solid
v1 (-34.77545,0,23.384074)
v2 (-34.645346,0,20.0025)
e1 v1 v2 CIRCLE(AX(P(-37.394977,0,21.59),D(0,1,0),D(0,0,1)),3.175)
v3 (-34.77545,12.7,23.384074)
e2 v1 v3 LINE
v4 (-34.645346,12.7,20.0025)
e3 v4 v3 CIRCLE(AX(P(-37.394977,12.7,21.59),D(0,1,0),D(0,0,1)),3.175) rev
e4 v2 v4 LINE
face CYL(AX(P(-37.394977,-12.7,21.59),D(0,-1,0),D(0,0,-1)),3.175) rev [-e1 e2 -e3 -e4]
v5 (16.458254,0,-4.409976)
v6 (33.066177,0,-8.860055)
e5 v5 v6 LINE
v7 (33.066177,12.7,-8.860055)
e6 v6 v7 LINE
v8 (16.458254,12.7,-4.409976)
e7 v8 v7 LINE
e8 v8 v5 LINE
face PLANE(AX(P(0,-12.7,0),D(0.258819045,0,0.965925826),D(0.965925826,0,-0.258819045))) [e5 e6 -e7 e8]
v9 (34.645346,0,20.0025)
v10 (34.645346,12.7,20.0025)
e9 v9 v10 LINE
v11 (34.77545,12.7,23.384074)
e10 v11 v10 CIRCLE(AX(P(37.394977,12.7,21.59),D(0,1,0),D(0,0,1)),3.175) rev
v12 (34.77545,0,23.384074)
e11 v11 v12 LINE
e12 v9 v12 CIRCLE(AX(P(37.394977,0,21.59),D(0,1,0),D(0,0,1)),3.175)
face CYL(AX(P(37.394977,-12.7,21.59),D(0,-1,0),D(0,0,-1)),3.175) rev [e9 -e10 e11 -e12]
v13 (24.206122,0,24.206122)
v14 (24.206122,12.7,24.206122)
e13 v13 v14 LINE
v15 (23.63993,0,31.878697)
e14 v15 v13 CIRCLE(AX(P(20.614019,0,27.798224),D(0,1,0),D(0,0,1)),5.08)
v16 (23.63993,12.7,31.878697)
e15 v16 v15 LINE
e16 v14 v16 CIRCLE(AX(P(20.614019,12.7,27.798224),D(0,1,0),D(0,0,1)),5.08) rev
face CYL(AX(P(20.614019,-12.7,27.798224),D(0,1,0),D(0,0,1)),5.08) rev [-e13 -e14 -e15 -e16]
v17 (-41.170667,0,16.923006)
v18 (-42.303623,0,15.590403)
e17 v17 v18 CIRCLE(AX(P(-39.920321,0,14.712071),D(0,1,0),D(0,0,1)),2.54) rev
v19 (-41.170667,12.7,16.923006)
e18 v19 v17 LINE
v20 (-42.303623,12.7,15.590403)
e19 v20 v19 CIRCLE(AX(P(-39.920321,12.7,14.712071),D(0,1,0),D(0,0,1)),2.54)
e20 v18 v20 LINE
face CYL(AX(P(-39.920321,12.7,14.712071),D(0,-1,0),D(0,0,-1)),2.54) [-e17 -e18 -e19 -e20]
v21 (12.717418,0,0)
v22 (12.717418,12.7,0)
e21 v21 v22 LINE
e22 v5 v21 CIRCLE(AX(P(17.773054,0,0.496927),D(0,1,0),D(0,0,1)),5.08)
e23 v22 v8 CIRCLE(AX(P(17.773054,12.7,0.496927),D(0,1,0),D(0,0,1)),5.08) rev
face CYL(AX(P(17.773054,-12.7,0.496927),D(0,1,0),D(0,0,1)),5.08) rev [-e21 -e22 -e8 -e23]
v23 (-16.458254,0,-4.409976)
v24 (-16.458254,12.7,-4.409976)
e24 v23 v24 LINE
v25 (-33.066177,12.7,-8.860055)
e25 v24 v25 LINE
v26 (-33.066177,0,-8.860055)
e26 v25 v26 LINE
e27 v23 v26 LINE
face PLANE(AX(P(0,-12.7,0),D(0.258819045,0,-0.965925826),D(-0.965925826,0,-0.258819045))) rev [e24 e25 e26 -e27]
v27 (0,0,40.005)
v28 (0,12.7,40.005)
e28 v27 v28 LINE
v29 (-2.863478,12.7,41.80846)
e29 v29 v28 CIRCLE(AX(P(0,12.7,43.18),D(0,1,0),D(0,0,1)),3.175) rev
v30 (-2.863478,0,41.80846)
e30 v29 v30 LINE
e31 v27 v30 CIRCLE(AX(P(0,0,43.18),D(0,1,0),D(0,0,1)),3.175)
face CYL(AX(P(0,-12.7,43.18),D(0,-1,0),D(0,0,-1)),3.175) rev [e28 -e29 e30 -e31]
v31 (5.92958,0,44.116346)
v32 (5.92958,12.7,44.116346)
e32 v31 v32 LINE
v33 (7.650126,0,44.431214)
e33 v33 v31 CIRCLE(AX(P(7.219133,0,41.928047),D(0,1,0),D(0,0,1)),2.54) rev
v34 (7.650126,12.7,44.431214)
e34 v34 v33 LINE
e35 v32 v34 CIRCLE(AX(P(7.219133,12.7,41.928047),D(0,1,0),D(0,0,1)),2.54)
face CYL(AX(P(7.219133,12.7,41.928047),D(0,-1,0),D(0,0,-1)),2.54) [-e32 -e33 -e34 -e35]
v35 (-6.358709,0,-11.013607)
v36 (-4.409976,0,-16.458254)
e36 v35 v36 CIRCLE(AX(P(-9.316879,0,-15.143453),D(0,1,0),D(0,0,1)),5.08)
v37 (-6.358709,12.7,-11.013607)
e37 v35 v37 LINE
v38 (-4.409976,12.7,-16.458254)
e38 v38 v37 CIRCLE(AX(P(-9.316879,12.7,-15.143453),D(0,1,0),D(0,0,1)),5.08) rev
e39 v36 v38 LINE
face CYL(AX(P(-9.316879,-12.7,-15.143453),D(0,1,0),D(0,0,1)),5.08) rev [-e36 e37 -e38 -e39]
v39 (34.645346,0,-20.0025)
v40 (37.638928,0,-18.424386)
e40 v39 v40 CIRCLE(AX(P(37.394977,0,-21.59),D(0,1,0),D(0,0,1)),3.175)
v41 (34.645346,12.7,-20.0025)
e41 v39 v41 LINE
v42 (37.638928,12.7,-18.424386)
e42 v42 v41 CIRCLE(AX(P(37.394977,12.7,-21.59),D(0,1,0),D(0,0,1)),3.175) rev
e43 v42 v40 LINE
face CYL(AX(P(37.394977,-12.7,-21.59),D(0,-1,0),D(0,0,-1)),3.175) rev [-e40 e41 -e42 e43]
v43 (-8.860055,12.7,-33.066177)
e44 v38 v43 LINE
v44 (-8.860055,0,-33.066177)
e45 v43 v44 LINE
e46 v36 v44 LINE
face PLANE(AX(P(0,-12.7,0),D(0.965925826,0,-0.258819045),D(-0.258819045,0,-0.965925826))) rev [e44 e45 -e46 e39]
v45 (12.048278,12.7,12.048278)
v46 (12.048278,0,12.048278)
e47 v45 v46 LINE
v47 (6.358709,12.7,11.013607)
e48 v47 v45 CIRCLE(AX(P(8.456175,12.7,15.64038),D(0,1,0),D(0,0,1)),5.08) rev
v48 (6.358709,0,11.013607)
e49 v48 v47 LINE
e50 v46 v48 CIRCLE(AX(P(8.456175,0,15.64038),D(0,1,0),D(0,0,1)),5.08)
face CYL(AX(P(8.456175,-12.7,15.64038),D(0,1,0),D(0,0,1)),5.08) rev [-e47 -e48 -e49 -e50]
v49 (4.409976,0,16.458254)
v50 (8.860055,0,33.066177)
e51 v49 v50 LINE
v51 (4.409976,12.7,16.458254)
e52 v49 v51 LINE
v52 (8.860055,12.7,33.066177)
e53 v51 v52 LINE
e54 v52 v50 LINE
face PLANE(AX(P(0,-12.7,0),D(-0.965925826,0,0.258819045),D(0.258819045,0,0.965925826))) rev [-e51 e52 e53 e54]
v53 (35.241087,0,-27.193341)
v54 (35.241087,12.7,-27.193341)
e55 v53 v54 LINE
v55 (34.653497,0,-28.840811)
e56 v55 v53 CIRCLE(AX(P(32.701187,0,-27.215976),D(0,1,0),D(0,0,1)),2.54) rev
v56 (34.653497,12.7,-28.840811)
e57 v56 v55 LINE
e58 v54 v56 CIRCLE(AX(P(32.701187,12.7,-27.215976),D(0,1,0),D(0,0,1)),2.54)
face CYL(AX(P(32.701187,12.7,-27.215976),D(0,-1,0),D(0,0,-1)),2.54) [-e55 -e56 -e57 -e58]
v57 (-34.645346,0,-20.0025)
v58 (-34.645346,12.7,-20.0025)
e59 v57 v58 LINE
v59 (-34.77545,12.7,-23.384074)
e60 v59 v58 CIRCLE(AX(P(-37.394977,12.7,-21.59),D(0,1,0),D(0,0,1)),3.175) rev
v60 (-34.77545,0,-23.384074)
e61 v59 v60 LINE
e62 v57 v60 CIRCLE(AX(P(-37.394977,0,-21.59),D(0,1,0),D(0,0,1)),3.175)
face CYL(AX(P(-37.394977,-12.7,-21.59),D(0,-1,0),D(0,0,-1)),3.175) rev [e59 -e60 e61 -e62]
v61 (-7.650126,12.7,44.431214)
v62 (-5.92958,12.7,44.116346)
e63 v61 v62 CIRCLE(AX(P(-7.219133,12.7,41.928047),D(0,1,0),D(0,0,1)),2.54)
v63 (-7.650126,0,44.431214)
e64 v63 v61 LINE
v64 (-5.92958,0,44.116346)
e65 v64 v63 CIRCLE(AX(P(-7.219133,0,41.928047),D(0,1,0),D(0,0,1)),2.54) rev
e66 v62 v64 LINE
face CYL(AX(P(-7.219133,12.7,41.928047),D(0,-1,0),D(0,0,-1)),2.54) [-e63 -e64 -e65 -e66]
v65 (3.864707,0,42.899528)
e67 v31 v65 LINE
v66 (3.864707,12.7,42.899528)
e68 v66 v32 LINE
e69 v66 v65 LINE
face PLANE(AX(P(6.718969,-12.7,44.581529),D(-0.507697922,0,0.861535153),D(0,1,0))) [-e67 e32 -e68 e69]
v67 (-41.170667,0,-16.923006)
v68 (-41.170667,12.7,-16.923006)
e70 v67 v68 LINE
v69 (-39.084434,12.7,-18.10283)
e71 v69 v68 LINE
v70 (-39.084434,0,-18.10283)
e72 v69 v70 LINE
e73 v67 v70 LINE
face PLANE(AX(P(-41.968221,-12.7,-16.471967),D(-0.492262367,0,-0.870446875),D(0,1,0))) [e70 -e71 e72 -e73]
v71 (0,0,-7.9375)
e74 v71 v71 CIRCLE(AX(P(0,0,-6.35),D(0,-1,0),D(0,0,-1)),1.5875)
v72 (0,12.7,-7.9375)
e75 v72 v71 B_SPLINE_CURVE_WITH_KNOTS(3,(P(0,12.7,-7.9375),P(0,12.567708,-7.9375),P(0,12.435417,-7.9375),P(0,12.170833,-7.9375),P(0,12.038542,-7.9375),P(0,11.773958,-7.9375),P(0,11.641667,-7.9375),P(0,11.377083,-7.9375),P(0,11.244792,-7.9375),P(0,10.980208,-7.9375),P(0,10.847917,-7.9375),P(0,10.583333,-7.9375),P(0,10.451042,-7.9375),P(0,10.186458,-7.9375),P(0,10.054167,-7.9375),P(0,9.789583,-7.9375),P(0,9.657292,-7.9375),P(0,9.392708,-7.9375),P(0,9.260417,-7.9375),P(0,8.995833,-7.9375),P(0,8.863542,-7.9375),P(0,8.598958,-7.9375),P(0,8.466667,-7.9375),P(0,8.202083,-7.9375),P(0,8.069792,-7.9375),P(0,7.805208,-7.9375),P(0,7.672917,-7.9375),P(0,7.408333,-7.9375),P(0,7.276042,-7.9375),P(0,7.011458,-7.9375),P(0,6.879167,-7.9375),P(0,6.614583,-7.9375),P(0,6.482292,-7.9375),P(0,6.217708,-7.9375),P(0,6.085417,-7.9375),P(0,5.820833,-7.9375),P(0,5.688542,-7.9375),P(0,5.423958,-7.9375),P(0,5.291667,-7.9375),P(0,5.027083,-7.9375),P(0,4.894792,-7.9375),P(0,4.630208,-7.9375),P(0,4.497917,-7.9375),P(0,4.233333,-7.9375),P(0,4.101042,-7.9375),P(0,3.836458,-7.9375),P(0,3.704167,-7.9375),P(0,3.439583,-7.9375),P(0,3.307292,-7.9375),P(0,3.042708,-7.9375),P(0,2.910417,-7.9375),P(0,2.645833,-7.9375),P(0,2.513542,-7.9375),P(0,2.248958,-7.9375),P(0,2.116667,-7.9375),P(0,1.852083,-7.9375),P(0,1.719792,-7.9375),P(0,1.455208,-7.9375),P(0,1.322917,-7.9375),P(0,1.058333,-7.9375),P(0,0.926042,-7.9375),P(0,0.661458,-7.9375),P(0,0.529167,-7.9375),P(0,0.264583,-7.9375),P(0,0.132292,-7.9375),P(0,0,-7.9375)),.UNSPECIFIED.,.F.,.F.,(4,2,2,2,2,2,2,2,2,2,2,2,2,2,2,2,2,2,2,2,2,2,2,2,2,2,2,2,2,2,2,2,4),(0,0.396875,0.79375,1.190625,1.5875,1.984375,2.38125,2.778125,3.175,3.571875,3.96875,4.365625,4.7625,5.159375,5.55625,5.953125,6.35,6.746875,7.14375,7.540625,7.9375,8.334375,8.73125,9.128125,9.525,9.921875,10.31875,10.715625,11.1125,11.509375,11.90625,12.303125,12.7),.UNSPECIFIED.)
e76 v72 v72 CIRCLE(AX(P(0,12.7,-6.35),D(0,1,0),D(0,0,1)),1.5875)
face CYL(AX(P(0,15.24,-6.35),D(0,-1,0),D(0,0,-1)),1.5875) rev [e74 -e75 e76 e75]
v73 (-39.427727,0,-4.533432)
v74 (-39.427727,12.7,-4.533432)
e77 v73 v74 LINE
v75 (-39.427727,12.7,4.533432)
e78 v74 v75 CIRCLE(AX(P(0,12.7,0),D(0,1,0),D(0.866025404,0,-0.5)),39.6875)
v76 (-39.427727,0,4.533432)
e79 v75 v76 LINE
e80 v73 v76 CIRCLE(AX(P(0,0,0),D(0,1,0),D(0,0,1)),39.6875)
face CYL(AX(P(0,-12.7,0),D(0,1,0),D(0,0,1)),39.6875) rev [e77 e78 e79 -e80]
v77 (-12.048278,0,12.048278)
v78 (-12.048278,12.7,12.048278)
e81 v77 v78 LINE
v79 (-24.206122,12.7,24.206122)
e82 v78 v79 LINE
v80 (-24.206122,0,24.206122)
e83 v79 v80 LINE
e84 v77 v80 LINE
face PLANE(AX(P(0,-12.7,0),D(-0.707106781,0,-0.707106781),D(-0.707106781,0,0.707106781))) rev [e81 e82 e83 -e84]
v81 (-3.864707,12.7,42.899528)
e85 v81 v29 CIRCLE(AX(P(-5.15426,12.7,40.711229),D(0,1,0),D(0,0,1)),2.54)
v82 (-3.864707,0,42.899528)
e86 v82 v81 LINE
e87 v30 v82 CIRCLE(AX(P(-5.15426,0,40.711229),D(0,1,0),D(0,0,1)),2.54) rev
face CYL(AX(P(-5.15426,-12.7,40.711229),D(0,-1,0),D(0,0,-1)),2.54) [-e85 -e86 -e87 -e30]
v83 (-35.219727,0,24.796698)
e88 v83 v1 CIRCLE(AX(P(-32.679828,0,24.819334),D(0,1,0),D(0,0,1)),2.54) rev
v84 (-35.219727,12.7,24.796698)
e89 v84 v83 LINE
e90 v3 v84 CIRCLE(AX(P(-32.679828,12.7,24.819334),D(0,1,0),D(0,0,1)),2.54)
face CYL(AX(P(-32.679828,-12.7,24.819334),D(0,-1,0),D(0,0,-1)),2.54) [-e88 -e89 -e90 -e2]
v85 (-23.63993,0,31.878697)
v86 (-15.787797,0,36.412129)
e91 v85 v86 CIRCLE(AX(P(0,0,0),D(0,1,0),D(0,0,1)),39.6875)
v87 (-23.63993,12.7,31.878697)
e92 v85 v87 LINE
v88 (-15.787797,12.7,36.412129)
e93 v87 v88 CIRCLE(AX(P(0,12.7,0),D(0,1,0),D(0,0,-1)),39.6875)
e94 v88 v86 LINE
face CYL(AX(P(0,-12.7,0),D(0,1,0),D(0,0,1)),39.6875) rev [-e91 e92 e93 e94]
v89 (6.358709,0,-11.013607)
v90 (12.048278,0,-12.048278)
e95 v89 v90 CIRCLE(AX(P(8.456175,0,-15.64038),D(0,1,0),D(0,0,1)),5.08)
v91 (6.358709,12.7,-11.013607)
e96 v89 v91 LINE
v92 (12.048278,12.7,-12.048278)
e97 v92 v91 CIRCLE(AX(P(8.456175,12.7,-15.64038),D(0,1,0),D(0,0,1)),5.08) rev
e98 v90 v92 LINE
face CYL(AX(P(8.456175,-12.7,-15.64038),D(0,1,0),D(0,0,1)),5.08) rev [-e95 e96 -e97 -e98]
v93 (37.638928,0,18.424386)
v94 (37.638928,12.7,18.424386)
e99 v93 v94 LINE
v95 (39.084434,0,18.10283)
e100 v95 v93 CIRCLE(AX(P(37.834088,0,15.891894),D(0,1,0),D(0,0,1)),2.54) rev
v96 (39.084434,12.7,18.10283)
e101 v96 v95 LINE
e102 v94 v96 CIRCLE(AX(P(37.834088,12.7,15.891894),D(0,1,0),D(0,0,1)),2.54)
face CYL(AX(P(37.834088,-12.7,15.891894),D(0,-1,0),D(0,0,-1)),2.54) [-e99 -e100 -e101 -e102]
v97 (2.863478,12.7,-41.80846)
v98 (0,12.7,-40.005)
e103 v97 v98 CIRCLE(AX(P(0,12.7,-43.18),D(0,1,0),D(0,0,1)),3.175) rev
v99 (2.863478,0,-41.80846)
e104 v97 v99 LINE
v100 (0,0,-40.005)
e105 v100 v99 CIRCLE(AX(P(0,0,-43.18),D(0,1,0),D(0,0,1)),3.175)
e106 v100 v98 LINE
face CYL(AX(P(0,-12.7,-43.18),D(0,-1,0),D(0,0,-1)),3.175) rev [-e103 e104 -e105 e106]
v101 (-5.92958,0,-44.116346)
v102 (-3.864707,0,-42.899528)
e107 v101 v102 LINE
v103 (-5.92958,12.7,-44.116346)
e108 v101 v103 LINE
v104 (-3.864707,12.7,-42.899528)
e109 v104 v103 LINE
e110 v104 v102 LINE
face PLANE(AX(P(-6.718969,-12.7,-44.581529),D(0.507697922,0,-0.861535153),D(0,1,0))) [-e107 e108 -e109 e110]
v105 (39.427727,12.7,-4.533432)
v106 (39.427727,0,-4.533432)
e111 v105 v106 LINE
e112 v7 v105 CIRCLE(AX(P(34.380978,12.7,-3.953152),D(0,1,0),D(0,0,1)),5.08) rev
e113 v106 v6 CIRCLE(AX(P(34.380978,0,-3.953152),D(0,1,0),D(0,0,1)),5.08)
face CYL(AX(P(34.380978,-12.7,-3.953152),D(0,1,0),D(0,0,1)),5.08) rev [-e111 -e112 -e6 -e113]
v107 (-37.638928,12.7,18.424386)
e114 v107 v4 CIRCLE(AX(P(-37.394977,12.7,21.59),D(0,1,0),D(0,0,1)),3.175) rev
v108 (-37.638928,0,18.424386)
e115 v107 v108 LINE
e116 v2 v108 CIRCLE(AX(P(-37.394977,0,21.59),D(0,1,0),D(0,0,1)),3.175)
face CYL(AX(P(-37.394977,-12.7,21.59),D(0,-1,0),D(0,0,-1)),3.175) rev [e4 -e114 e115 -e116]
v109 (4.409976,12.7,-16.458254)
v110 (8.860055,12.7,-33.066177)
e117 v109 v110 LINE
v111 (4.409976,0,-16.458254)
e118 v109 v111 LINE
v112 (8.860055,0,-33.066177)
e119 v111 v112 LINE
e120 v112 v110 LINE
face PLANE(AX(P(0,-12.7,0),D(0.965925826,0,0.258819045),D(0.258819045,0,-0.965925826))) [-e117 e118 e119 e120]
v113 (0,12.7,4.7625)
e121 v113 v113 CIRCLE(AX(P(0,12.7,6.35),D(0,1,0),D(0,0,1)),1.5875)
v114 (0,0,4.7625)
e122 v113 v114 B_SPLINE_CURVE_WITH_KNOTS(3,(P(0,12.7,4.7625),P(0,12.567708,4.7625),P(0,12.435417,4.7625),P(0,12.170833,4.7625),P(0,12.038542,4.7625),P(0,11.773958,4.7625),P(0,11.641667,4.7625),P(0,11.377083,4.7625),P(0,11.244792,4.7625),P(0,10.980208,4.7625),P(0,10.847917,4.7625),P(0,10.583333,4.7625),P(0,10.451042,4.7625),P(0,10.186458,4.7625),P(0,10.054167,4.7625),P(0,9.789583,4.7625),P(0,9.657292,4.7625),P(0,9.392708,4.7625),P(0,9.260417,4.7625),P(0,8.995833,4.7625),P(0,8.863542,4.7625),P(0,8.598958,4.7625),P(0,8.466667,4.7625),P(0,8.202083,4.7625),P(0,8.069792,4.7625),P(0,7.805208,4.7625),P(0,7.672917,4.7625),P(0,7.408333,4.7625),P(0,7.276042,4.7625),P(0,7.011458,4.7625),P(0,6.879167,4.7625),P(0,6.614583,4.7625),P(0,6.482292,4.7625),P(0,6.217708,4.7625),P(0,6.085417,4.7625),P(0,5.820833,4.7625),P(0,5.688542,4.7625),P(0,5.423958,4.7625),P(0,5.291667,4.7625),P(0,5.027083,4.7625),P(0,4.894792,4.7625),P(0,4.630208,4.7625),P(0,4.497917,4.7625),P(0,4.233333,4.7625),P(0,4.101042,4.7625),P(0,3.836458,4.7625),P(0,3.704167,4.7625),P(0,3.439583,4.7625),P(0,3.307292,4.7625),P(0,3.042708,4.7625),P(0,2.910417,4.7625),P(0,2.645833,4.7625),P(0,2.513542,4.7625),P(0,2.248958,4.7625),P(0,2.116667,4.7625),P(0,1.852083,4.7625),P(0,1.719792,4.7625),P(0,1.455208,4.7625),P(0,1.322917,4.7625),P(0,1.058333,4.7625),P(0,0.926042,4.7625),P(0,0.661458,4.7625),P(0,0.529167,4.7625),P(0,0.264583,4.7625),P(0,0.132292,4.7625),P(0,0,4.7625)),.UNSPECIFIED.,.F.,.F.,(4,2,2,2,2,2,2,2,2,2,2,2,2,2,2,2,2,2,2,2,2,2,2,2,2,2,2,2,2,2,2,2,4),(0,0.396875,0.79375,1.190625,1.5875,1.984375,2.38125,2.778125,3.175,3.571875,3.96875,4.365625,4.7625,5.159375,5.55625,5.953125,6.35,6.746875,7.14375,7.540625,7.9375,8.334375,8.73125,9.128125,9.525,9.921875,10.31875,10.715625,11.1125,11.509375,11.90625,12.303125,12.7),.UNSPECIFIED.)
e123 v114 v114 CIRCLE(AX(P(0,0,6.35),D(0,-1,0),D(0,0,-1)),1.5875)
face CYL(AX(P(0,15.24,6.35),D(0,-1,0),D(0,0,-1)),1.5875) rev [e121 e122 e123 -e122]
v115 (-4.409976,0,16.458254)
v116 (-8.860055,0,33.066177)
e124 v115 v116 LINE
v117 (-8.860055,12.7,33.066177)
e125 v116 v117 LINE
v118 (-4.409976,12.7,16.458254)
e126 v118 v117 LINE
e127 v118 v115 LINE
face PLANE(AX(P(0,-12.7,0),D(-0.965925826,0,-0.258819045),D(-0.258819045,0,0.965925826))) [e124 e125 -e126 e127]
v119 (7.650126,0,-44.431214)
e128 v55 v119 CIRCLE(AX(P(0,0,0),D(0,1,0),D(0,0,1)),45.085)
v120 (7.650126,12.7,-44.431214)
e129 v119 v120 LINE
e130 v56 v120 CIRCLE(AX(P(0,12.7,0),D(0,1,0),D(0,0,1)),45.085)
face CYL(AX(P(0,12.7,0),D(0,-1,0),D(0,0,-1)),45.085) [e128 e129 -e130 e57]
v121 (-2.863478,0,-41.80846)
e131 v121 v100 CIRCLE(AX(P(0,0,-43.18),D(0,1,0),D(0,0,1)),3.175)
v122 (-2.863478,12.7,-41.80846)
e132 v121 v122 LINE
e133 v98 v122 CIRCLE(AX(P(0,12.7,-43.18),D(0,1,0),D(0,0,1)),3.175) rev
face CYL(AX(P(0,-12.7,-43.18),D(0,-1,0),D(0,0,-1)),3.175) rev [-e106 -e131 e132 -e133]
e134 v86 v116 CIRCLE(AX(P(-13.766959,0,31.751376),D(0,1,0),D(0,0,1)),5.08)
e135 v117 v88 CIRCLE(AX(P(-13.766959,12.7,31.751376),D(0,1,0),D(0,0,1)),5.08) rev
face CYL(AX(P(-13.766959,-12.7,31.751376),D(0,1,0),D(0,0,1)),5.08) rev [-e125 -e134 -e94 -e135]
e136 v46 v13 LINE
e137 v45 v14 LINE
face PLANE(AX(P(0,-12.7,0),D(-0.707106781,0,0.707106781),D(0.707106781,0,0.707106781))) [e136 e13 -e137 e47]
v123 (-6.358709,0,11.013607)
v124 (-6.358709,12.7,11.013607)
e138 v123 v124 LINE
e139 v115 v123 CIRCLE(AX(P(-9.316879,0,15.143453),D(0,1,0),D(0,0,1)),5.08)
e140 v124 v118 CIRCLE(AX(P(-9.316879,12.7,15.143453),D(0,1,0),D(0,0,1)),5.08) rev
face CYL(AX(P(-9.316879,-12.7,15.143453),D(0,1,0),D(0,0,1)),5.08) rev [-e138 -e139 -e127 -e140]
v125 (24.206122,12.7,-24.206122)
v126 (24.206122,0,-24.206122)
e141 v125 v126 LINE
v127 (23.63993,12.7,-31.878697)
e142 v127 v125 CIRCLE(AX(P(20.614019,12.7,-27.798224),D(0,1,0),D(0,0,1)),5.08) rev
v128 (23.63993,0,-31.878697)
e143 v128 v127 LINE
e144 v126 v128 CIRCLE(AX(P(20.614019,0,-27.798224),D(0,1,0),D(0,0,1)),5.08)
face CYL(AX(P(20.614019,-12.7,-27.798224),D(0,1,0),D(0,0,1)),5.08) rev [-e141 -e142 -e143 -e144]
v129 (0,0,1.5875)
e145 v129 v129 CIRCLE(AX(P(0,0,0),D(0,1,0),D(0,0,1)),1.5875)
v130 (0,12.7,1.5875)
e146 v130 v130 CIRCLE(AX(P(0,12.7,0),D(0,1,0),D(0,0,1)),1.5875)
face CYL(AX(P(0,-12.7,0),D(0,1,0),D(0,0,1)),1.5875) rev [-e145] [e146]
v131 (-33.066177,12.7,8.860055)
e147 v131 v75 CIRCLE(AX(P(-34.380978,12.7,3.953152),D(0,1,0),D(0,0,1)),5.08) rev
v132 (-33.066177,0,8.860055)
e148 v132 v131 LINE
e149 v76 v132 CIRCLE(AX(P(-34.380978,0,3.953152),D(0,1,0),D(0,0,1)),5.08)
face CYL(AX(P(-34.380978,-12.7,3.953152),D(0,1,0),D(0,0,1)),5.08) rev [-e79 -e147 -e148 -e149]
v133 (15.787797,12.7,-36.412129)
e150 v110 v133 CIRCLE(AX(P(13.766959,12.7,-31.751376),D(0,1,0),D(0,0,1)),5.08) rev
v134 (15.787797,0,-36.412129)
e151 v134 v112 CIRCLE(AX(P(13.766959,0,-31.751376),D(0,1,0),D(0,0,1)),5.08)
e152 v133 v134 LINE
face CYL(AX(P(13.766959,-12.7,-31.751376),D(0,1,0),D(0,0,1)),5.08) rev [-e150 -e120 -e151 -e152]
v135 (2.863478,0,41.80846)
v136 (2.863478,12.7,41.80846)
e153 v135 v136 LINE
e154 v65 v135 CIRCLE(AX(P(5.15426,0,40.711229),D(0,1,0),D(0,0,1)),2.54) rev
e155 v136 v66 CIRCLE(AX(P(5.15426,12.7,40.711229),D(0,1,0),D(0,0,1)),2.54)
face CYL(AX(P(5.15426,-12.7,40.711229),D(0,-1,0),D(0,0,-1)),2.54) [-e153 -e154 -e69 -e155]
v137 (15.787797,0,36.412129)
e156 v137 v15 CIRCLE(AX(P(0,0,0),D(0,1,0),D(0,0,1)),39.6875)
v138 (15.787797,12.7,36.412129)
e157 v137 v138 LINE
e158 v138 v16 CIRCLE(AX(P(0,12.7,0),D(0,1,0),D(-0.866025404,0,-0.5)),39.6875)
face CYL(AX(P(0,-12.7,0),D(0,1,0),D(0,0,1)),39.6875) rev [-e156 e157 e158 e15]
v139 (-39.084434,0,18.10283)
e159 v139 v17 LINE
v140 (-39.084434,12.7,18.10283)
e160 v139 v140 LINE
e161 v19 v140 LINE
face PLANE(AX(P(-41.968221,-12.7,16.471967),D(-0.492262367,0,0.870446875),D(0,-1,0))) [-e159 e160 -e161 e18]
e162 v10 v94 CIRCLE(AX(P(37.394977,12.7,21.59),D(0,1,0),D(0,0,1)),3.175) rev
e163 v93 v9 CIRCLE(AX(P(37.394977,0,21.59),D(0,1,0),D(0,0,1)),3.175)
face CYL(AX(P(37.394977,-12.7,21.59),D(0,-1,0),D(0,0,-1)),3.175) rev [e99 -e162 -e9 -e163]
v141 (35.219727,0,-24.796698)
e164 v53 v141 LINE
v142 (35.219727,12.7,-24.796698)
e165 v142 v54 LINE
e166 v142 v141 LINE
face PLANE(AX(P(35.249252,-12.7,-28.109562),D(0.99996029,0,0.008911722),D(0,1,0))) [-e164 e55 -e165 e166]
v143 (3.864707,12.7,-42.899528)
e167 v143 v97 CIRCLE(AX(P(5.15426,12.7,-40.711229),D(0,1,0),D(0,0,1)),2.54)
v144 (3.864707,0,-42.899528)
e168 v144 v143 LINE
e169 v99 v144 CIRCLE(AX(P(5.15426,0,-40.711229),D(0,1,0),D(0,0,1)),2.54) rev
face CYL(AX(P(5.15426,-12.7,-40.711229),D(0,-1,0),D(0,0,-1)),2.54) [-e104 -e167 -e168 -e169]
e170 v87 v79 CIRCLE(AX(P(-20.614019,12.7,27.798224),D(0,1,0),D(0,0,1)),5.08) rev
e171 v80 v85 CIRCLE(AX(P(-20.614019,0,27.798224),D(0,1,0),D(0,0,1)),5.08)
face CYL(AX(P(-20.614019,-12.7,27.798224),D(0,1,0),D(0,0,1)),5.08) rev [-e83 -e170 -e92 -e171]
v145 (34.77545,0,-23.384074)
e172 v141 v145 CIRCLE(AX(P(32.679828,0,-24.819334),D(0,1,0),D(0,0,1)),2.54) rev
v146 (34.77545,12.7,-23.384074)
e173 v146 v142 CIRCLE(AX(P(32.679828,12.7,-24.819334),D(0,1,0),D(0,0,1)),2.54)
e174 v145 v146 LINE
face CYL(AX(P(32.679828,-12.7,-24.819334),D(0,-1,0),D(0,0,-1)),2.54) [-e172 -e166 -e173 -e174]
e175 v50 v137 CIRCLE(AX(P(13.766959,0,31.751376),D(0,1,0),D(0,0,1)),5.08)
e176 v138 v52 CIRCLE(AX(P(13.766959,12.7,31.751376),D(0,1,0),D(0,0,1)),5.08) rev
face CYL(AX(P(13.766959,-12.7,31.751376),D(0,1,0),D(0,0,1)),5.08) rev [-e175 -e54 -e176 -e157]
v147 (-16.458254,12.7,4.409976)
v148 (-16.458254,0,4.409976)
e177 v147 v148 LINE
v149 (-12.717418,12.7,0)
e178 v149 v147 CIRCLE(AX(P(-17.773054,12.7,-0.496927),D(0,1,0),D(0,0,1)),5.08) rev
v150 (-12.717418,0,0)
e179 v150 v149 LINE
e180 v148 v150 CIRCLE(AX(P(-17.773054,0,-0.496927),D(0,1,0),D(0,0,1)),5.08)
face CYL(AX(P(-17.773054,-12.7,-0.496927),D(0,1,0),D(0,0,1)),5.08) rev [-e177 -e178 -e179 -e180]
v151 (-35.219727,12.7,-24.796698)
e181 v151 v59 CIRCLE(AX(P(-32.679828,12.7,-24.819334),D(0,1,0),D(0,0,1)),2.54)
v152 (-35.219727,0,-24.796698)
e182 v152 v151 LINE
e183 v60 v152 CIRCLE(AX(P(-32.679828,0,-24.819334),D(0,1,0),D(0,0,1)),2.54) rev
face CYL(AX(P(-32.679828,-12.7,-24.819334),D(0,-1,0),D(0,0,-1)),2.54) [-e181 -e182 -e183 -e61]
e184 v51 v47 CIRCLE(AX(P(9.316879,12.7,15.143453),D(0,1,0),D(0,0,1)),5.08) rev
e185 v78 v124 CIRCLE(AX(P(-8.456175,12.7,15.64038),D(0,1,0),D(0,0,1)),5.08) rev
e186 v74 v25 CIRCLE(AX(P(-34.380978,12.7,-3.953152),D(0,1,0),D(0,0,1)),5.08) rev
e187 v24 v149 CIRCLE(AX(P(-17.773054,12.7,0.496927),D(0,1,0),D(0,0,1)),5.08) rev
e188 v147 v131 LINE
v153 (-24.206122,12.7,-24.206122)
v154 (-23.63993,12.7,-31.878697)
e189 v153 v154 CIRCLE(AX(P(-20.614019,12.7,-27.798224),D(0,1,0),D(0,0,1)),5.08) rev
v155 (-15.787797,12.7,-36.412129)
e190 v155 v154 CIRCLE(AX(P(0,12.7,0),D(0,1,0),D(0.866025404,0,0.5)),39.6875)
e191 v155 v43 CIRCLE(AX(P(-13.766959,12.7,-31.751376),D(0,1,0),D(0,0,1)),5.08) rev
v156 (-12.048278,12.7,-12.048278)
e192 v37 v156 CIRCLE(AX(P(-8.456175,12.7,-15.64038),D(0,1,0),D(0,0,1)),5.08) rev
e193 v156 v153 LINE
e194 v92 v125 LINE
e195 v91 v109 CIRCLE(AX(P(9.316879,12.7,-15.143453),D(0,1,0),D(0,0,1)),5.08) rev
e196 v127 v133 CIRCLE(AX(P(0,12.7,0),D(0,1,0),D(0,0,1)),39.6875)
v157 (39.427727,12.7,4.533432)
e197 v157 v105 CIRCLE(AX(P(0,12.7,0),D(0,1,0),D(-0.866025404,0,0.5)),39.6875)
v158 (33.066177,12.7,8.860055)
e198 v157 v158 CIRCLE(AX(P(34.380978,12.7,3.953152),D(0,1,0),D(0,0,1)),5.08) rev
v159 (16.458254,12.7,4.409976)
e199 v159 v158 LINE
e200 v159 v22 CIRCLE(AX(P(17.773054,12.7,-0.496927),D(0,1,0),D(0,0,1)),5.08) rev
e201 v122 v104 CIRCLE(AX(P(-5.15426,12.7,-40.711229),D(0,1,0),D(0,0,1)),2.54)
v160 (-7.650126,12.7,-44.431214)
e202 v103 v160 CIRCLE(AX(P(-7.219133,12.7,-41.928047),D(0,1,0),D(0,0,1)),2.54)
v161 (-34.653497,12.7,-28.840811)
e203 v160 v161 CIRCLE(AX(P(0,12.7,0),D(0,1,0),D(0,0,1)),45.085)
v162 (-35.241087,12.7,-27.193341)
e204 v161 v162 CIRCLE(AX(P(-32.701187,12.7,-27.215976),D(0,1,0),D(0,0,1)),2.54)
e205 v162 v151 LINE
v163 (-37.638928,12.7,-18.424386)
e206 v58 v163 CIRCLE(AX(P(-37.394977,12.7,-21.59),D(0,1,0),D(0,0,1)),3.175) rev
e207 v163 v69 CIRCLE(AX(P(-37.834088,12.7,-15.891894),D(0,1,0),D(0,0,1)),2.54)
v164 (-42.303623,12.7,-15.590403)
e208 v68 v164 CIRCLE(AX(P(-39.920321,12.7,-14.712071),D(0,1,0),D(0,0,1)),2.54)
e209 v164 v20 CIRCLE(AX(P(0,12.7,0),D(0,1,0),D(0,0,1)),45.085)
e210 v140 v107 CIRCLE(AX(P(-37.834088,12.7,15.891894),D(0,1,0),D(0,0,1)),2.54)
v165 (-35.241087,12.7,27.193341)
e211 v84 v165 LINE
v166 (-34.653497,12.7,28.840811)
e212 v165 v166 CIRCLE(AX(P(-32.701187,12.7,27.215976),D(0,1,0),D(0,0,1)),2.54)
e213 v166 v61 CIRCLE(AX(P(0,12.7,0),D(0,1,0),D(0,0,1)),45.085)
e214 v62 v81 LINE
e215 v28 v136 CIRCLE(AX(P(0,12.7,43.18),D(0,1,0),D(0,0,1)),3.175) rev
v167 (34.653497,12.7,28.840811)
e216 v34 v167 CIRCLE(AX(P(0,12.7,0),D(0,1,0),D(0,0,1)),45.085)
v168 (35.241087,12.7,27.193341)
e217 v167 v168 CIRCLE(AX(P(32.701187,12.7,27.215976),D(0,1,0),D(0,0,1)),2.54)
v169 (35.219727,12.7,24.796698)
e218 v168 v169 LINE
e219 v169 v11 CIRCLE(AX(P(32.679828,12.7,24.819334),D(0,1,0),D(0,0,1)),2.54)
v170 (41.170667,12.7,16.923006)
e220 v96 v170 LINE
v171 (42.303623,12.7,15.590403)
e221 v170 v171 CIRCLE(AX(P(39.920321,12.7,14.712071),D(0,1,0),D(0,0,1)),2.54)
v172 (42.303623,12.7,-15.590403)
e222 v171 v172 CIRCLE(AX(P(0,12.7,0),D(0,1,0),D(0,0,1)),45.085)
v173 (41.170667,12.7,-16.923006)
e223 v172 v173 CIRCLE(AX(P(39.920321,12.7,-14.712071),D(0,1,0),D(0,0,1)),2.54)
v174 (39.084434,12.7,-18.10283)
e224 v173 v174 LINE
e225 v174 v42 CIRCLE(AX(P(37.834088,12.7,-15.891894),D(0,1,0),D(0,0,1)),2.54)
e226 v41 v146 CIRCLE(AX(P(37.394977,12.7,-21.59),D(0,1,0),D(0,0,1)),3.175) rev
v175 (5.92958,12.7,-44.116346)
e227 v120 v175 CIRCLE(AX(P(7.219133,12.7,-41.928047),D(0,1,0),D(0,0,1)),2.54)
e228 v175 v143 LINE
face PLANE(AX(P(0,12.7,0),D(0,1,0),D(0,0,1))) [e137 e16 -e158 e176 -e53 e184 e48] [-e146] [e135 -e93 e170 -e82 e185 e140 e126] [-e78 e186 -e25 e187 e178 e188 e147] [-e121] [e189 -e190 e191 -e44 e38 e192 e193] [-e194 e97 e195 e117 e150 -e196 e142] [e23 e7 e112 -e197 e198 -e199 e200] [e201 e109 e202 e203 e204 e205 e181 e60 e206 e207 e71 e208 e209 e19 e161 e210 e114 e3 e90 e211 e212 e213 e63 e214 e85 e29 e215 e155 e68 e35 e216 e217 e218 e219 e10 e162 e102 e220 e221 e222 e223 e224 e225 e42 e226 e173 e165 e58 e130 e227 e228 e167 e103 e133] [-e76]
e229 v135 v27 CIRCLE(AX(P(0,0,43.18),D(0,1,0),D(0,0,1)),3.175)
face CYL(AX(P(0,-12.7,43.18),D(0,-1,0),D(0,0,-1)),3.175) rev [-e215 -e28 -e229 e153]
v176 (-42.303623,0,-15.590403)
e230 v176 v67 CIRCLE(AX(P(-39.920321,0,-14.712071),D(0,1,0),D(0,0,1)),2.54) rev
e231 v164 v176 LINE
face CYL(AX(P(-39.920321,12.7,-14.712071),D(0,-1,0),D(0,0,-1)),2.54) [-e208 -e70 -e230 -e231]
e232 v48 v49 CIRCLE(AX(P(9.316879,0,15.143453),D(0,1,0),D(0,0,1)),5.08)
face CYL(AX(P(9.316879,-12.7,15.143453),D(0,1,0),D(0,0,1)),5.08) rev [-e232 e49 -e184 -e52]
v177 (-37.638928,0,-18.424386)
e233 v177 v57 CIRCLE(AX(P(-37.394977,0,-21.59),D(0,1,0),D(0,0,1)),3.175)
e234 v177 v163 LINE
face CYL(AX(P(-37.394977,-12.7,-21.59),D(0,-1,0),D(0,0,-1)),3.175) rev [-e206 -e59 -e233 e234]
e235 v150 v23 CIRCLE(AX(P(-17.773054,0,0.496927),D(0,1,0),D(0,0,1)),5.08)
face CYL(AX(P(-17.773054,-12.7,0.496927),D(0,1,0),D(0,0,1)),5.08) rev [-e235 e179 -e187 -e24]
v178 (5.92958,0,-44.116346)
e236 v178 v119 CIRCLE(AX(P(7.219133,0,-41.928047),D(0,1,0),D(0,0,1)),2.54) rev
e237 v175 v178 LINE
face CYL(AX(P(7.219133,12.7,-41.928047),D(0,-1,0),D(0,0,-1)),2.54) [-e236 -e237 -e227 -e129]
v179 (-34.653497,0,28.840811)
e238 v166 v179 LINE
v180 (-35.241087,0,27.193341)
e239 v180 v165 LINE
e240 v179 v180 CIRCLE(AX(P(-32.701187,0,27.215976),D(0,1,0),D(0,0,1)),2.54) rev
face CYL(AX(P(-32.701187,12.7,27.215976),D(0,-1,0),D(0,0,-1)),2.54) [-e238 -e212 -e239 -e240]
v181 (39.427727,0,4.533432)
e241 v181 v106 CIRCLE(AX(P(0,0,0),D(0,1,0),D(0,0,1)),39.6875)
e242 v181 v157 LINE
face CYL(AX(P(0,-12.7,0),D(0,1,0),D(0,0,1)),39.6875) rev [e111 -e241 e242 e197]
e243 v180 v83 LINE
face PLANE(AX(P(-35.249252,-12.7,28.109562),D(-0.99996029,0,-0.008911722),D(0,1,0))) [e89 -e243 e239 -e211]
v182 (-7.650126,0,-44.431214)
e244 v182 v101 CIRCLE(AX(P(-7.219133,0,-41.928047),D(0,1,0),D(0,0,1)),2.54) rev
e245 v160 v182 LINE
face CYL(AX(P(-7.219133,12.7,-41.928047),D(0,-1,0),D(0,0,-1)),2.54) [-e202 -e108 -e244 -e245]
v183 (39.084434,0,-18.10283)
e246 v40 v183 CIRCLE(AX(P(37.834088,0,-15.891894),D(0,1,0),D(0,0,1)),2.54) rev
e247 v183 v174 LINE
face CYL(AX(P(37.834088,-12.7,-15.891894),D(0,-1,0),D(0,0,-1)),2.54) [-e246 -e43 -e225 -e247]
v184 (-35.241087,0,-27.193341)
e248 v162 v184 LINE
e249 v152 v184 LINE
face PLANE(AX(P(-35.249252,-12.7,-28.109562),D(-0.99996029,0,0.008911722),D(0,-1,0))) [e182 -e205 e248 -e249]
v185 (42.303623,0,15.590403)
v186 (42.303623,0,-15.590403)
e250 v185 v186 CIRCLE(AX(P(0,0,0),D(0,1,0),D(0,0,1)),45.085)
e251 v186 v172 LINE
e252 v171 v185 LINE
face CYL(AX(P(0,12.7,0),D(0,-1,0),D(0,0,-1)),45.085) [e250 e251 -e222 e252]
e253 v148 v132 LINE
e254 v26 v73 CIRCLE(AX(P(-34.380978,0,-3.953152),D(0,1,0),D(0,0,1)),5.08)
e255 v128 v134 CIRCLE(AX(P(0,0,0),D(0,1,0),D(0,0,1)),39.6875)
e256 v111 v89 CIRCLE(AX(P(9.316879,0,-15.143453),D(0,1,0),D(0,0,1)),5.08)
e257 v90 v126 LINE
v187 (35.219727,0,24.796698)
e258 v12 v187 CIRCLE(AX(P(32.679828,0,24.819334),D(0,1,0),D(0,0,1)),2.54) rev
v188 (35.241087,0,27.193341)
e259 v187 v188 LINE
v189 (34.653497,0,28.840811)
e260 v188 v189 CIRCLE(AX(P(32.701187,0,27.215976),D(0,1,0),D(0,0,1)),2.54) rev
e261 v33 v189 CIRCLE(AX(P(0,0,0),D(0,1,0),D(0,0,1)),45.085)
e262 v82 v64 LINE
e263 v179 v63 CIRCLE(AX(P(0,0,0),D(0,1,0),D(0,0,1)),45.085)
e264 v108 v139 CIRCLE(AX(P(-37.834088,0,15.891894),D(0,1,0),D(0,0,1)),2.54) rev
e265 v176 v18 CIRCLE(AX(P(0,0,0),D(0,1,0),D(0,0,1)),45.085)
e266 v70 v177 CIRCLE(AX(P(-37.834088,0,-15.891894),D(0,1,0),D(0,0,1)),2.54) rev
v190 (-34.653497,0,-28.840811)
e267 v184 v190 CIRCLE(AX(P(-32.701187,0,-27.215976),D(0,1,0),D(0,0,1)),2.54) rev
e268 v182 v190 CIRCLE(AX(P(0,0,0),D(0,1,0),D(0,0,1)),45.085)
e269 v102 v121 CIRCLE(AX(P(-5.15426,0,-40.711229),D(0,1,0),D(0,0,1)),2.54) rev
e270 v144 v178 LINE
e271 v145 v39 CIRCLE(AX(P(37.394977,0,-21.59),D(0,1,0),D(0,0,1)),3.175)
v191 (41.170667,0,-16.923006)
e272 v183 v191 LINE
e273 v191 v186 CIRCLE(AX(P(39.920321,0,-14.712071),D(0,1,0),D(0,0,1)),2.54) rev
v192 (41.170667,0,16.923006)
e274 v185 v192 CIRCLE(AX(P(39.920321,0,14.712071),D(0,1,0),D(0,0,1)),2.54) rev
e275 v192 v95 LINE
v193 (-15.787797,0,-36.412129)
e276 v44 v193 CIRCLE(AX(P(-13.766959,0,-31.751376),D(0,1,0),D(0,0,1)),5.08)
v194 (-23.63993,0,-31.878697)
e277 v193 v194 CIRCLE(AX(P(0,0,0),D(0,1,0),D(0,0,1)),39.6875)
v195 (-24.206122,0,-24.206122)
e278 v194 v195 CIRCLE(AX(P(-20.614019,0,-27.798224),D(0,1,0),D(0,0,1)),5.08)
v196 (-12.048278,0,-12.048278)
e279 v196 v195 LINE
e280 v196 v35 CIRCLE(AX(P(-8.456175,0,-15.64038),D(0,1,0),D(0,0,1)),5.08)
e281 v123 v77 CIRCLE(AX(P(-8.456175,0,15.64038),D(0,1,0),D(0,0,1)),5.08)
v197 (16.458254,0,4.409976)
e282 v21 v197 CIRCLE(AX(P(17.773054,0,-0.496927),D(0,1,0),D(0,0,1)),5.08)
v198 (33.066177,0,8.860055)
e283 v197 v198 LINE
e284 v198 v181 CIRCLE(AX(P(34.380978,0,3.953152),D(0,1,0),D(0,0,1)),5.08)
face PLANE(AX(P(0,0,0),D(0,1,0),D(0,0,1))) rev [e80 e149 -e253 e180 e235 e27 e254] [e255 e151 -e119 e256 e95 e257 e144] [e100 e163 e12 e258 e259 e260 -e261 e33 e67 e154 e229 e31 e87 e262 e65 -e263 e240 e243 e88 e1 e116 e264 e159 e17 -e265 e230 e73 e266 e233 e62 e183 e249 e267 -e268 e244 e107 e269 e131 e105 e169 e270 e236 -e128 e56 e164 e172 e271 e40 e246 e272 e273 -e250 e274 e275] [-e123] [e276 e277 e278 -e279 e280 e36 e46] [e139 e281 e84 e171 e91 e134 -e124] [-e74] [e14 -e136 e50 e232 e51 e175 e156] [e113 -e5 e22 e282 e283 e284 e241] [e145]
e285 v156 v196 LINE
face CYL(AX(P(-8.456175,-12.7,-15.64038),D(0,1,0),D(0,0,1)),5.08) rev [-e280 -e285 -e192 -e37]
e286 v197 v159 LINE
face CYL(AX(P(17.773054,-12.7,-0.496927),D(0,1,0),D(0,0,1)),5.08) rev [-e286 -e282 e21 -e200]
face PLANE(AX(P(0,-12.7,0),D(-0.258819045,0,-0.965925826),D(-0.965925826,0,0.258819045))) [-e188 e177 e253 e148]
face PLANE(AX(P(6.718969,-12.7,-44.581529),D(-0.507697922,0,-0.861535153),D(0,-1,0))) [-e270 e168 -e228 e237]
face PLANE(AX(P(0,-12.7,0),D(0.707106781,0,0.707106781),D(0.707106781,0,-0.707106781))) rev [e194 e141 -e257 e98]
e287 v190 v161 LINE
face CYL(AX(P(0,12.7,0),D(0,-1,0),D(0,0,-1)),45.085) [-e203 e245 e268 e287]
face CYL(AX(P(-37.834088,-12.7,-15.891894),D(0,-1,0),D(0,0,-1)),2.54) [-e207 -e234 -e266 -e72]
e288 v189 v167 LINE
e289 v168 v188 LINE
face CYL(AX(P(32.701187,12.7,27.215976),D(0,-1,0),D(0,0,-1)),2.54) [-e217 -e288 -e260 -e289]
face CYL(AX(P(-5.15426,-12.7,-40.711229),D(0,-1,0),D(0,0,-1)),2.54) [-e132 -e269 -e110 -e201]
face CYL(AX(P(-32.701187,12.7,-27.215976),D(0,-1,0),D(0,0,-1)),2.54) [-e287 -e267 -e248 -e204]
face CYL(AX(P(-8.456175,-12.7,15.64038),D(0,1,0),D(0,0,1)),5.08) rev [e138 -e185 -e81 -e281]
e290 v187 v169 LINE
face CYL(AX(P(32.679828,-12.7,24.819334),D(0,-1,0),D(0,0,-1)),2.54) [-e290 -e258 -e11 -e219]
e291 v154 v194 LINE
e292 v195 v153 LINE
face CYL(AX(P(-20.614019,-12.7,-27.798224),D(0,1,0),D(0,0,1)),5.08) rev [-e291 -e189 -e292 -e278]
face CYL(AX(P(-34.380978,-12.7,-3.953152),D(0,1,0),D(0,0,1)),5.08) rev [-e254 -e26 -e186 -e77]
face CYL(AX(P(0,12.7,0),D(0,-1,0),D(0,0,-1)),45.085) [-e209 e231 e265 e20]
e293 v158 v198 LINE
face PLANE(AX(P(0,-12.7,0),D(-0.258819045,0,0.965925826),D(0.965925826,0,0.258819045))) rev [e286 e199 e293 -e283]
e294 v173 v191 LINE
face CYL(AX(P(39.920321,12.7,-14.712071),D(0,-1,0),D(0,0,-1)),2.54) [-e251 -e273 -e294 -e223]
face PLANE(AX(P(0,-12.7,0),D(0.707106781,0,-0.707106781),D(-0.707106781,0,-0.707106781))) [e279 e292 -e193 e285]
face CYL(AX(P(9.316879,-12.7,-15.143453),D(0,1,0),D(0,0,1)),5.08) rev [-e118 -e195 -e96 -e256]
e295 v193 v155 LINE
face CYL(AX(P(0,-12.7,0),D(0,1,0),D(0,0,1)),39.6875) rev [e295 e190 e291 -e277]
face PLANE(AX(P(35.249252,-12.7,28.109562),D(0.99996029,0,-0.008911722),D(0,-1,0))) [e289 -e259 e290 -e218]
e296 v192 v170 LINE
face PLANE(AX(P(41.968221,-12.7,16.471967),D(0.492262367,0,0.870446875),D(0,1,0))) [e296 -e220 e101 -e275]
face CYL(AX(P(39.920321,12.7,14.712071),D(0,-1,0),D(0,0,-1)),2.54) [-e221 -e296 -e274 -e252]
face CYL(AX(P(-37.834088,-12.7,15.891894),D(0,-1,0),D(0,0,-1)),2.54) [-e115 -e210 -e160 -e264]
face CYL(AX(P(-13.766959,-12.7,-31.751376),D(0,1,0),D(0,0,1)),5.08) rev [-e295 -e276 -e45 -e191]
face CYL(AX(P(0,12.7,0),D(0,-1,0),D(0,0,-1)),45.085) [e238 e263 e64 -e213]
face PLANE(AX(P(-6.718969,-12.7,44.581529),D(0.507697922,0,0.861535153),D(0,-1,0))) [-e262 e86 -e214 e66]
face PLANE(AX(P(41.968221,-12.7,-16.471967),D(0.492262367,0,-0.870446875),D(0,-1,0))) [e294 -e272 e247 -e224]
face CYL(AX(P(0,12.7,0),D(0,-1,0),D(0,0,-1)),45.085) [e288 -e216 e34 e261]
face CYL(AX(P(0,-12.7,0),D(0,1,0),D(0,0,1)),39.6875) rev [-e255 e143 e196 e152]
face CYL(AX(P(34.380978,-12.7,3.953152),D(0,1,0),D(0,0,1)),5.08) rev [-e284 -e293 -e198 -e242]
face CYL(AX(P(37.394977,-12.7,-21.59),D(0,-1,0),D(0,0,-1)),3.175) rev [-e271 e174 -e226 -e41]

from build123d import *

# Parameters (mm, degrees)
SKETCH1_R                = 45.085
BOSS_EXTRUDE1_DEPTH      = 12.7
SKETCH2_W                = 6.35
SKETCH2_H                = 6.35
CUT_EXTRUDE1_DEPTH       = 25.4
FILLET1_R                = 3.175
SKETCH3_R                = 1.5875
CUT_EXTRUDE2_DEPTH       = 25.4
CUT_EXTRUDE4_DEPTH       = 25.4
FILLET4_R                = 5.08
CIRPATTERN3_COUNT        = 6
FILLET4_OF_CIRPATTERN3_R = 5.08
SKETCH5_R                = 1.5875
CUT_EXTRUDE5_DEPTH       = 15.24
CHAMFER1_START           = -1
CHAMFER1_DEPTH           = 15
FILLET5_R                = 2.54
CIRPATTERN7_START        = -1
CIRPATTERN7_DEPTH        = 15


with BuildPart() as part:
    # Sketch1 → Boss-Extrude1 (new body)
    with BuildSketch(Plane(origin=(0, 0, 0), x_dir=(1, 0, 0), z_dir=(0, 1, 0))):
        with Locations(Location((0, 0, 0), (0, 0, 270))):
            Circle(SKETCH1_R)
    extrude(amount=BOSS_EXTRUDE1_DEPTH)

    # Sketch2 → Cut-Extrude1 (cut)
    with BuildSketch(Plane(origin=(0, 12.7, 0), x_dir=(1, 0, 0), z_dir=(0, 1, 0))):
        with Locations((0, 43.18)):
            Rectangle(SKETCH2_W, SKETCH2_H)
    extrude(amount=-CUT_EXTRUDE1_DEPTH, mode=Mode.SUBTRACT)

    # Fillet1
    fillet1_edges = [part.edges().sort_by_distance(p)[0] for p in [
        (3.175, 6.35, -40.005),
        (-3.175, 6.35, -40.005),
    ]]
    fillet(fillet1_edges, radius=FILLET1_R - 0.0001)  # a hair under: the kernel refuses the full size

    # Sketch3 → Cut-Extrude2 (cut)
    with BuildSketch(Plane(origin=(0, 12.7, 0), x_dir=(1, 0, 0), z_dir=(0, 1, 0))):
        with Locations(Location((0, 0, 0), (0, 0, 270))):
            Circle(SKETCH3_R)
    extrude(amount=-CUT_EXTRUDE2_DEPTH, mode=Mode.SUBTRACT)

    # Sketch4 → Cut-Extrude4 (cut)
    with BuildSketch(Plane(origin=(0, 12.7, 0), x_dir=(1, 0, 0), z_dir=(0, 1, 0))):
        with BuildLine():
            Line((10.271880853, 38.335181231), (3.287001873, 12.267257994))
            ThreePointArc((3.287001873, 12.267257994), (6.35, 10.998522628), (8.980256121, 8.980256121))
            Line((8.980256121, 8.980256121), (28.063300378, 28.063300378))
            ThreePointArc((28.063300378, 28.063300378), (19.84375, 34.370383213), (10.271880853, 38.335181231))
        make_face()
    cut_extrude4 = extrude(amount=-CUT_EXTRUDE4_DEPTH, mode=Mode.SUBTRACT)

    # Fillet4
    # the kernel refuses this fillet: 5.08 mm, written as the material it adds along each edge
    with BuildSketch(Plane(origin=(8.980256121, 12.7, -8.980256121), x_dir=(0.707106781186551, 0, -0.7071067811865441), z_dir=(0, -1, 0))) as fillet4_piece_1:
        with BuildLine():
            CenterArc((4.338837989, -5.08), FILLET4_R, 90, 73.398450401)
            ThreePointArc((-0.529401437, -3.628571429), (-0.133047272, -1.833493693), (0, 0))
            Line((0, 0), (4.338837989, 0))
        make_face()
    extrude(amount=12.7)
    with BuildSketch(Plane(origin=(3.287001873, 12.7, -12.267257994), x_dir=(0.2588190451024908, 0, -0.9659258262890763), z_dir=(0, -1, 0))) as fillet4_piece_2:
        with BuildLine():
            CenterArc((4.338837989, 5.08), FILLET4_R, 196.601549599, 73.398450401)
            ThreePointArc((-0.529401437, 3.628571429), (-0.133047272, 1.833493693), (0, 0))
            Line((0, 0), (4.338837989, 0))
        make_face()
    extrude(amount=12.7)
    with BuildSketch(Plane(origin=(28.063300378, 12.7, -28.063300378), x_dir=(-0.7071067811865437, 0, 0.7071067811865515), z_dir=(0, -1, 0))) as fillet4_piece_3:
        with BuildLine():
            CenterArc((5.454874389, 5.08), FILLET4_R, 171.559110559, 98.440889441)
            ThreePointArc((0.429901822, 5.825688073), (0.107621375, 2.920764331), (0, 0))
            Line((0, 0), (5.454874389, 0))
        make_face()
    extrude(amount=12.7)
    with BuildSketch(Plane(origin=(10.271880853, 12.7, -38.335181231), x_dir=(0.9442589613921284, 0, 0.3292036054338696), z_dir=(0, -1, 0))) as fillet4_piece_4:
        with BuildLine():
            CenterArc((5.467670827, 5.066224464), FILLET4_R, 175.779555279, 98.440889441)
            Line((0.401446363, 5.440082298), (0, 0))
            ThreePointArc((0, 0), (2.920764331, -0.107621375), (5.841528662, 0))
        make_face()
    extrude(amount=12.7)

    # CirPattern3: Cut-Extrude4 ×6 about axis
    cirpattern3_axis = Axis((0, 0, 0), (0, 1, 0))
    for i in range(1, CIRPATTERN3_COUNT):
        add(cut_extrude4.rotate(cirpattern3_axis, i * 360 / CIRPATTERN3_COUNT), mode=Mode.SUBTRACT)

    # Fillet4 of CirPattern3
    # the kernel refuses this fillet: 5.08 mm, written as the material it adds along each edge
    with BuildSketch(Plane(origin=(-3.287001873, 12.7, -12.267257994), x_dir=(-0.25881904510251585, 0, -0.9659258262890695), z_dir=(0, -1, 0)), Plane(origin=(-12.267257994, 12.7, -3.287001873), x_dir=(-0.965925826289067, 0, -0.2588190451025258), z_dir=(0, -1, 0)), Plane(origin=(-8.980256121, 12.7, 8.980256121), x_dir=(-0.7071067811865508, 0, 0.7071067811865442), z_dir=(0, -1, 0)), Plane(origin=(3.287001873, 12.7, 12.267257994), x_dir=(0.2588190451025157, 0, 0.9659258262890696), z_dir=(0, -1, 0)), Plane(origin=(12.267257994, 12.7, 3.287001873), x_dir=(0.9659258262890671, 0, 0.25881904510252524), z_dir=(0, -1, 0))) as fillet4_of_cirpattern3_piece_1:
        with BuildLine():
            CenterArc((4.338837989, -5.08), FILLET4_OF_CIRPATTERN3_R, 90, 73.398450401)
            ThreePointArc((-0.529401437, -3.628571429), (-0.133047272, -1.833493693), (0, 0))
            Line((0, 0), (4.338837989, 0))
        make_face()
    extrude(amount=12.7)
    with BuildSketch(Plane(origin=(-8.980256121, 12.7, -8.980256121), x_dir=(0.801783725737267, 0, -0.5976143046672051), z_dir=(0, -1, 0)), Plane(origin=(-12.267257994, 12.7, 3.287001873), x_dir=(-0.1166573066381411, 0, -0.9931722271630106), z_dir=(0, -1, 0)), Plane(origin=(-3.287001873, 12.7, 12.267257994), x_dir=(-0.9184410323754069, 0, -0.39555792249580446), z_dir=(0, -1, 0)), Plane(origin=(8.980256121, 12.7, 8.980256121), x_dir=(-0.8017837257372662, 0, 0.5976143046672062), z_dir=(0, -1, 0))) as fillet4_of_cirpattern3_piece_2:
        with BuildLine():
            CenterArc((4.400384864, -5.026781091), FILLET4_OF_CIRPATTERN3_R, 98.3007748, 73.398450401)
            Line((-0.626396227, -4.293383614), (0, 0))
            ThreePointArc((0, 0), (1.833493693, -0.133047272), (3.666987387, 0))
        make_face()
    extrude(amount=12.7)
    with BuildSketch(Plane(origin=(-10.271880853, 12.7, -38.335181231), x_dir=(0.25881904510252557, 0, 0.9659258262890671), z_dir=(0, -1, 0)), Plane(origin=(-38.335181231, 12.7, -10.271880853), x_dir=(0.9659258262890696, 0, 0.25881904510251547), z_dir=(0, -1, 0)), Plane(origin=(-28.063300378, 12.7, 28.063300378), x_dir=(0.7071067811865429, 0, -0.707106781186552), z_dir=(0, -1, 0)), Plane(origin=(10.271880853, 12.7, 38.335181231), x_dir=(-0.2588190451025262, 0, -0.9659258262890669), z_dir=(0, -1, 0)), Plane(origin=(38.335181231, 12.7, 10.271880853), x_dir=(-0.9659258262890699, 0, -0.25881904510251486), z_dir=(0, -1, 0))) as fillet4_of_cirpattern3_piece_3:
        with BuildLine():
            CenterArc((5.454874389, 5.08), FILLET4_OF_CIRPATTERN3_R, 171.559110559, 98.440889441)
            ThreePointArc((0.429901822, 5.825688073), (0.107621375, 2.920764331), (0, 0))
            Line((0, 0), (5.454874389, 0))
        make_face()
    extrude(amount=12.7)
    with BuildSketch(Plane(origin=(-28.063300378, 12.7, -28.063300378), x_dir=(0.757228166019224, 0, -0.653150445599758), z_dir=(0, -1, 0)), Plane(origin=(-38.335181231, 12.7, 10.271880853), x_dir=(-0.18703079537290557, 0, -0.9823540510336272), z_dir=(0, -1, 0)), Plane(origin=(-10.271880853, 12.7, 38.335181231), x_dir=(-0.9442589613921285, 0, -0.32920360543386923), z_dir=(0, -1, 0)), Plane(origin=(28.063300378, 12.7, 28.063300378), x_dir=(-0.7572281660192255, 0, 0.6531504455997565), z_dir=(0, -1, 0)), Plane(origin=(38.335181231, 12.7, -10.271880853), x_dir=(0.1870307953729042, 0, 0.9823540510336275), z_dir=(0, -1, 0))) as fillet4_of_cirpattern3_piece_4:
        with BuildLine():
            CenterArc((5.467670827, 5.066224464), FILLET4_OF_CIRPATTERN3_R, 175.779555279, 98.440889441)
            Line((0.401446363, 5.440082298), (0, 0))
            ThreePointArc((0, 0), (2.920764331, -0.107621375), (5.841528662, 0))
        make_face()
    extrude(amount=12.7)
    with BuildSketch(Plane(origin=(12.267257994, 12.7, -3.287001873), x_dir=(0.9659258262890604, 0, -0.25881904510255027), z_dir=(0, -1, 0))) as fillet4_of_cirpattern3_piece_5:
        with BuildLine():
            CenterArc((4.338837989, 5.08), FILLET4_OF_CIRPATTERN3_R, 196.601549599, 73.398450401)
            ThreePointArc((-0.529401437, 3.628571429), (-0.133047272, 1.833493693), (0, 0))
            Line((0, 0), (4.338837989, 0))
        make_face()
    extrude(amount=12.7)

    # Sketch5 → Cut-Extrude5 (cut)
    with BuildSketch(Plane.XZ):
        with Locations(Location((0, 6.35, 0), (0, 0, 270))):
            Circle(SKETCH5_R)
        with Locations(Location((0, -6.35, 0), (0, 0, 270))):
            Circle(SKETCH5_R)
    extrude(amount=-CUT_EXTRUDE5_DEPTH, mode=Mode.SUBTRACT)

    # Chamfer1: read off the stored shape, not the designer's step
    # Chamfer1 outline → Chamfer1 (cut)
    with BuildSketch(Plane(origin=(0, 0, 0), x_dir=(1, 0, 0), z_dir=(0, 1, 0)).offset(CHAMFER1_START)):
        with BuildLine():
            Line((-6.718968573, 44.581528532), (-3.087994239, 42.441815348))
            ThreePointArc((-3.087994239, 42.441815348), (-3.153173537, 42.808352794), (-3.175, 43.18))
            Line((-3.175, 43.18), (-3.175, 44.973065272))
            ThreePointArc((-3.175, 44.973065272), (-4.950856369, 44.812344797), (-6.718968573, 44.581528532))
        make_face()
        with BuildLine():
            Line((3.087994239, 42.441815348), (6.718968573, 44.581528532))
            ThreePointArc((6.718968573, 44.581528532), (4.950856369, 44.812344797), (3.175, 44.973065272))
            Line((3.175, 44.973065272), (3.175, 43.18))
            ThreePointArc((3.175, 43.18), (3.153173537, 42.808352794), (3.087994239, 42.441815348))
        make_face()
    extrude(amount=CHAMFER1_DEPTH, mode=Mode.SUBTRACT)

    # Fillet5
    fillet5_edges = [part.edges().sort_by_distance(p)[0] for p in [
        (6.718968573, 6.35, -44.581528532),
        (-6.718968573, 6.35, -44.581528532),
        (-3.088018782, 6.35, -42.441829811),
        (3.088018782, 6.35, -42.441829811),
    ]]
    fillet(fillet5_edges, radius=FILLET5_R)

    # CirPattern7: read off the stored shape, not the designer's step
    # CirPattern7 outline → CirPattern7 (cut)
    with BuildSketch(Plane(origin=(0, 0, 0), x_dir=(1, 0, 0), z_dir=(0, 1, 0)).offset(CIRPATTERN7_START)):
        with BuildLine():
            ThreePointArc((41.170667008, 16.92300591), (41.855471454, 16.357303704), (42.303623317, 15.590403436))
            ThreePointArc((42.303623317, 15.590403436), (39.04475533, 22.5425), (34.653497089, 28.840810746))
            ThreePointArc((34.653497089, 28.840810746), (35.093576272, 28.069249714), (35.24108653, 27.193340565))
            Line((35.24108653, 27.193340565), (35.219727473, 24.796698321))
            ThreePointArc((35.219727473, 24.796698321), (35.102820214, 24.057290552), (34.775449936, 23.384074497))
            ThreePointArc((34.775449936, 23.384074497), (34.222324259, 21.71206554), (34.645346278, 20.0025))
            ThreePointArc((34.645346278, 20.0025), (35.914362456, 18.781369415), (37.638927526, 18.424385824))
            ThreePointArc((37.638927526, 18.424385824), (38.385634871, 18.371288774), (39.084434412, 18.102829545))
            Line((39.084434412, 18.102829545), (41.170667008, 16.92300591))
        make_face()
        with BuildLine():
            ThreePointArc((35.24108653, -27.193340565), (35.093576272, -28.069249714), (34.653497089, -28.840810746))
            ThreePointArc((34.653497089, -28.840810746), (39.04475533, -22.5425), (42.303623317, -15.590403436))
            ThreePointArc((42.303623317, -15.590403436), (41.855471454, -16.357303704), (41.170667008, -16.92300591))
            Line((41.170667008, -16.92300591), (39.084434412, -18.102829545))
            ThreePointArc((39.084434412, -18.102829545), (38.385634871, -18.371288774), (37.638927526, -18.424385824))
            ThreePointArc((37.638927526, -18.424385824), (35.914362456, -18.781369415), (34.645346278, -20.0025))
            ThreePointArc((34.645346278, -20.0025), (34.222324259, -21.71206554), (34.775449936, -23.384074497))
            ThreePointArc((34.775449936, -23.384074497), (35.102820214, -24.057290552), (35.219727473, -24.796698321))
            Line((35.219727473, -24.796698321), (35.24108653, -27.193340565))
        make_face()
        with BuildLine():
            ThreePointArc((-5.929580478, -44.116346474), (-6.761895182, -44.426553418), (-7.650126228, -44.431214182))
            ThreePointArc((-7.650126228, -44.431214182), (0, -45.085), (7.650126228, -44.431214182))
            ThreePointArc((7.650126228, -44.431214182), (6.761895182, -44.426553418), (5.929580478, -44.116346474))
            Line((5.929580478, -44.116346474), (3.864706939, -42.899527866))
            ThreePointArc((3.864706939, -42.899527866), (3.282814657, -42.428579326), (2.86347759, -41.808460321))
            ThreePointArc((2.86347759, -41.808460321), (1.692038197, -40.493434955), (0, -40.005))
            ThreePointArc((0, -40.005), (-1.692038197, -40.493434955), (-2.86347759, -41.808460321))
            ThreePointArc((-2.86347759, -41.808460321), (-3.282814657, -42.428579326), (-3.864706939, -42.899527866))
            Line((-3.864706939, -42.899527866), (-5.929580478, -44.116346474))
        make_face()
        with BuildLine():
            ThreePointArc((-41.170667008, -16.92300591), (-41.855471454, -16.357303704), (-42.303623317, -15.590403436))
            ThreePointArc((-42.303623317, -15.590403436), (-39.04475533, -22.5425), (-34.653497089, -28.840810746))
            ThreePointArc((-34.653497089, -28.840810746), (-35.093576272, -28.069249714), (-35.24108653, -27.193340565))
            Line((-35.24108653, -27.193340565), (-35.219727473, -24.796698321))
            ThreePointArc((-35.219727473, -24.796698321), (-35.102820214, -24.057290552), (-34.775449936, -23.384074497))
            ThreePointArc((-34.775449936, -23.384074497), (-34.222324259, -21.71206554), (-34.645346278, -20.0025))
            ThreePointArc((-34.645346278, -20.0025), (-35.914362456, -18.781369415), (-37.638927526, -18.424385824))
            ThreePointArc((-37.638927526, -18.424385824), (-38.385634871, -18.371288774), (-39.084434412, -18.102829545))
            Line((-39.084434412, -18.102829545), (-41.170667008, -16.92300591))
        make_face()
        with BuildLine():
            ThreePointArc((-37.638927526, 18.424385824), (-35.914362456, 18.781369415), (-34.645346278, 20.0025))
            ThreePointArc((-34.645346278, 20.0025), (-34.222324259, 21.71206554), (-34.775449936, 23.384074497))
            ThreePointArc((-34.775449936, 23.384074497), (-35.102820214, 24.057290552), (-35.219727473, 24.796698321))
            Line((-35.219727473, 24.796698321), (-35.24108653, 27.193340565))
            ThreePointArc((-35.24108653, 27.193340565), (-35.093576272, 28.069249714), (-34.653497089, 28.840810746))
            ThreePointArc((-34.653497089, 28.840810746), (-39.04475533, 22.5425), (-42.303623316, 15.590403436))
            ThreePointArc((-42.303623316, 15.590403436), (-41.855471454, 16.357303704), (-41.170667008, 16.92300591))
            Line((-41.170667008, 16.92300591), (-39.084434412, 18.102829545))
            ThreePointArc((-39.084434412, 18.102829545), (-38.385634871, 18.371288774), (-37.638927526, 18.424385824))
        make_face()
    extrude(amount=CIRPATTERN7_DEPTH, mode=Mode.SUBTRACT)


solid = part.part
